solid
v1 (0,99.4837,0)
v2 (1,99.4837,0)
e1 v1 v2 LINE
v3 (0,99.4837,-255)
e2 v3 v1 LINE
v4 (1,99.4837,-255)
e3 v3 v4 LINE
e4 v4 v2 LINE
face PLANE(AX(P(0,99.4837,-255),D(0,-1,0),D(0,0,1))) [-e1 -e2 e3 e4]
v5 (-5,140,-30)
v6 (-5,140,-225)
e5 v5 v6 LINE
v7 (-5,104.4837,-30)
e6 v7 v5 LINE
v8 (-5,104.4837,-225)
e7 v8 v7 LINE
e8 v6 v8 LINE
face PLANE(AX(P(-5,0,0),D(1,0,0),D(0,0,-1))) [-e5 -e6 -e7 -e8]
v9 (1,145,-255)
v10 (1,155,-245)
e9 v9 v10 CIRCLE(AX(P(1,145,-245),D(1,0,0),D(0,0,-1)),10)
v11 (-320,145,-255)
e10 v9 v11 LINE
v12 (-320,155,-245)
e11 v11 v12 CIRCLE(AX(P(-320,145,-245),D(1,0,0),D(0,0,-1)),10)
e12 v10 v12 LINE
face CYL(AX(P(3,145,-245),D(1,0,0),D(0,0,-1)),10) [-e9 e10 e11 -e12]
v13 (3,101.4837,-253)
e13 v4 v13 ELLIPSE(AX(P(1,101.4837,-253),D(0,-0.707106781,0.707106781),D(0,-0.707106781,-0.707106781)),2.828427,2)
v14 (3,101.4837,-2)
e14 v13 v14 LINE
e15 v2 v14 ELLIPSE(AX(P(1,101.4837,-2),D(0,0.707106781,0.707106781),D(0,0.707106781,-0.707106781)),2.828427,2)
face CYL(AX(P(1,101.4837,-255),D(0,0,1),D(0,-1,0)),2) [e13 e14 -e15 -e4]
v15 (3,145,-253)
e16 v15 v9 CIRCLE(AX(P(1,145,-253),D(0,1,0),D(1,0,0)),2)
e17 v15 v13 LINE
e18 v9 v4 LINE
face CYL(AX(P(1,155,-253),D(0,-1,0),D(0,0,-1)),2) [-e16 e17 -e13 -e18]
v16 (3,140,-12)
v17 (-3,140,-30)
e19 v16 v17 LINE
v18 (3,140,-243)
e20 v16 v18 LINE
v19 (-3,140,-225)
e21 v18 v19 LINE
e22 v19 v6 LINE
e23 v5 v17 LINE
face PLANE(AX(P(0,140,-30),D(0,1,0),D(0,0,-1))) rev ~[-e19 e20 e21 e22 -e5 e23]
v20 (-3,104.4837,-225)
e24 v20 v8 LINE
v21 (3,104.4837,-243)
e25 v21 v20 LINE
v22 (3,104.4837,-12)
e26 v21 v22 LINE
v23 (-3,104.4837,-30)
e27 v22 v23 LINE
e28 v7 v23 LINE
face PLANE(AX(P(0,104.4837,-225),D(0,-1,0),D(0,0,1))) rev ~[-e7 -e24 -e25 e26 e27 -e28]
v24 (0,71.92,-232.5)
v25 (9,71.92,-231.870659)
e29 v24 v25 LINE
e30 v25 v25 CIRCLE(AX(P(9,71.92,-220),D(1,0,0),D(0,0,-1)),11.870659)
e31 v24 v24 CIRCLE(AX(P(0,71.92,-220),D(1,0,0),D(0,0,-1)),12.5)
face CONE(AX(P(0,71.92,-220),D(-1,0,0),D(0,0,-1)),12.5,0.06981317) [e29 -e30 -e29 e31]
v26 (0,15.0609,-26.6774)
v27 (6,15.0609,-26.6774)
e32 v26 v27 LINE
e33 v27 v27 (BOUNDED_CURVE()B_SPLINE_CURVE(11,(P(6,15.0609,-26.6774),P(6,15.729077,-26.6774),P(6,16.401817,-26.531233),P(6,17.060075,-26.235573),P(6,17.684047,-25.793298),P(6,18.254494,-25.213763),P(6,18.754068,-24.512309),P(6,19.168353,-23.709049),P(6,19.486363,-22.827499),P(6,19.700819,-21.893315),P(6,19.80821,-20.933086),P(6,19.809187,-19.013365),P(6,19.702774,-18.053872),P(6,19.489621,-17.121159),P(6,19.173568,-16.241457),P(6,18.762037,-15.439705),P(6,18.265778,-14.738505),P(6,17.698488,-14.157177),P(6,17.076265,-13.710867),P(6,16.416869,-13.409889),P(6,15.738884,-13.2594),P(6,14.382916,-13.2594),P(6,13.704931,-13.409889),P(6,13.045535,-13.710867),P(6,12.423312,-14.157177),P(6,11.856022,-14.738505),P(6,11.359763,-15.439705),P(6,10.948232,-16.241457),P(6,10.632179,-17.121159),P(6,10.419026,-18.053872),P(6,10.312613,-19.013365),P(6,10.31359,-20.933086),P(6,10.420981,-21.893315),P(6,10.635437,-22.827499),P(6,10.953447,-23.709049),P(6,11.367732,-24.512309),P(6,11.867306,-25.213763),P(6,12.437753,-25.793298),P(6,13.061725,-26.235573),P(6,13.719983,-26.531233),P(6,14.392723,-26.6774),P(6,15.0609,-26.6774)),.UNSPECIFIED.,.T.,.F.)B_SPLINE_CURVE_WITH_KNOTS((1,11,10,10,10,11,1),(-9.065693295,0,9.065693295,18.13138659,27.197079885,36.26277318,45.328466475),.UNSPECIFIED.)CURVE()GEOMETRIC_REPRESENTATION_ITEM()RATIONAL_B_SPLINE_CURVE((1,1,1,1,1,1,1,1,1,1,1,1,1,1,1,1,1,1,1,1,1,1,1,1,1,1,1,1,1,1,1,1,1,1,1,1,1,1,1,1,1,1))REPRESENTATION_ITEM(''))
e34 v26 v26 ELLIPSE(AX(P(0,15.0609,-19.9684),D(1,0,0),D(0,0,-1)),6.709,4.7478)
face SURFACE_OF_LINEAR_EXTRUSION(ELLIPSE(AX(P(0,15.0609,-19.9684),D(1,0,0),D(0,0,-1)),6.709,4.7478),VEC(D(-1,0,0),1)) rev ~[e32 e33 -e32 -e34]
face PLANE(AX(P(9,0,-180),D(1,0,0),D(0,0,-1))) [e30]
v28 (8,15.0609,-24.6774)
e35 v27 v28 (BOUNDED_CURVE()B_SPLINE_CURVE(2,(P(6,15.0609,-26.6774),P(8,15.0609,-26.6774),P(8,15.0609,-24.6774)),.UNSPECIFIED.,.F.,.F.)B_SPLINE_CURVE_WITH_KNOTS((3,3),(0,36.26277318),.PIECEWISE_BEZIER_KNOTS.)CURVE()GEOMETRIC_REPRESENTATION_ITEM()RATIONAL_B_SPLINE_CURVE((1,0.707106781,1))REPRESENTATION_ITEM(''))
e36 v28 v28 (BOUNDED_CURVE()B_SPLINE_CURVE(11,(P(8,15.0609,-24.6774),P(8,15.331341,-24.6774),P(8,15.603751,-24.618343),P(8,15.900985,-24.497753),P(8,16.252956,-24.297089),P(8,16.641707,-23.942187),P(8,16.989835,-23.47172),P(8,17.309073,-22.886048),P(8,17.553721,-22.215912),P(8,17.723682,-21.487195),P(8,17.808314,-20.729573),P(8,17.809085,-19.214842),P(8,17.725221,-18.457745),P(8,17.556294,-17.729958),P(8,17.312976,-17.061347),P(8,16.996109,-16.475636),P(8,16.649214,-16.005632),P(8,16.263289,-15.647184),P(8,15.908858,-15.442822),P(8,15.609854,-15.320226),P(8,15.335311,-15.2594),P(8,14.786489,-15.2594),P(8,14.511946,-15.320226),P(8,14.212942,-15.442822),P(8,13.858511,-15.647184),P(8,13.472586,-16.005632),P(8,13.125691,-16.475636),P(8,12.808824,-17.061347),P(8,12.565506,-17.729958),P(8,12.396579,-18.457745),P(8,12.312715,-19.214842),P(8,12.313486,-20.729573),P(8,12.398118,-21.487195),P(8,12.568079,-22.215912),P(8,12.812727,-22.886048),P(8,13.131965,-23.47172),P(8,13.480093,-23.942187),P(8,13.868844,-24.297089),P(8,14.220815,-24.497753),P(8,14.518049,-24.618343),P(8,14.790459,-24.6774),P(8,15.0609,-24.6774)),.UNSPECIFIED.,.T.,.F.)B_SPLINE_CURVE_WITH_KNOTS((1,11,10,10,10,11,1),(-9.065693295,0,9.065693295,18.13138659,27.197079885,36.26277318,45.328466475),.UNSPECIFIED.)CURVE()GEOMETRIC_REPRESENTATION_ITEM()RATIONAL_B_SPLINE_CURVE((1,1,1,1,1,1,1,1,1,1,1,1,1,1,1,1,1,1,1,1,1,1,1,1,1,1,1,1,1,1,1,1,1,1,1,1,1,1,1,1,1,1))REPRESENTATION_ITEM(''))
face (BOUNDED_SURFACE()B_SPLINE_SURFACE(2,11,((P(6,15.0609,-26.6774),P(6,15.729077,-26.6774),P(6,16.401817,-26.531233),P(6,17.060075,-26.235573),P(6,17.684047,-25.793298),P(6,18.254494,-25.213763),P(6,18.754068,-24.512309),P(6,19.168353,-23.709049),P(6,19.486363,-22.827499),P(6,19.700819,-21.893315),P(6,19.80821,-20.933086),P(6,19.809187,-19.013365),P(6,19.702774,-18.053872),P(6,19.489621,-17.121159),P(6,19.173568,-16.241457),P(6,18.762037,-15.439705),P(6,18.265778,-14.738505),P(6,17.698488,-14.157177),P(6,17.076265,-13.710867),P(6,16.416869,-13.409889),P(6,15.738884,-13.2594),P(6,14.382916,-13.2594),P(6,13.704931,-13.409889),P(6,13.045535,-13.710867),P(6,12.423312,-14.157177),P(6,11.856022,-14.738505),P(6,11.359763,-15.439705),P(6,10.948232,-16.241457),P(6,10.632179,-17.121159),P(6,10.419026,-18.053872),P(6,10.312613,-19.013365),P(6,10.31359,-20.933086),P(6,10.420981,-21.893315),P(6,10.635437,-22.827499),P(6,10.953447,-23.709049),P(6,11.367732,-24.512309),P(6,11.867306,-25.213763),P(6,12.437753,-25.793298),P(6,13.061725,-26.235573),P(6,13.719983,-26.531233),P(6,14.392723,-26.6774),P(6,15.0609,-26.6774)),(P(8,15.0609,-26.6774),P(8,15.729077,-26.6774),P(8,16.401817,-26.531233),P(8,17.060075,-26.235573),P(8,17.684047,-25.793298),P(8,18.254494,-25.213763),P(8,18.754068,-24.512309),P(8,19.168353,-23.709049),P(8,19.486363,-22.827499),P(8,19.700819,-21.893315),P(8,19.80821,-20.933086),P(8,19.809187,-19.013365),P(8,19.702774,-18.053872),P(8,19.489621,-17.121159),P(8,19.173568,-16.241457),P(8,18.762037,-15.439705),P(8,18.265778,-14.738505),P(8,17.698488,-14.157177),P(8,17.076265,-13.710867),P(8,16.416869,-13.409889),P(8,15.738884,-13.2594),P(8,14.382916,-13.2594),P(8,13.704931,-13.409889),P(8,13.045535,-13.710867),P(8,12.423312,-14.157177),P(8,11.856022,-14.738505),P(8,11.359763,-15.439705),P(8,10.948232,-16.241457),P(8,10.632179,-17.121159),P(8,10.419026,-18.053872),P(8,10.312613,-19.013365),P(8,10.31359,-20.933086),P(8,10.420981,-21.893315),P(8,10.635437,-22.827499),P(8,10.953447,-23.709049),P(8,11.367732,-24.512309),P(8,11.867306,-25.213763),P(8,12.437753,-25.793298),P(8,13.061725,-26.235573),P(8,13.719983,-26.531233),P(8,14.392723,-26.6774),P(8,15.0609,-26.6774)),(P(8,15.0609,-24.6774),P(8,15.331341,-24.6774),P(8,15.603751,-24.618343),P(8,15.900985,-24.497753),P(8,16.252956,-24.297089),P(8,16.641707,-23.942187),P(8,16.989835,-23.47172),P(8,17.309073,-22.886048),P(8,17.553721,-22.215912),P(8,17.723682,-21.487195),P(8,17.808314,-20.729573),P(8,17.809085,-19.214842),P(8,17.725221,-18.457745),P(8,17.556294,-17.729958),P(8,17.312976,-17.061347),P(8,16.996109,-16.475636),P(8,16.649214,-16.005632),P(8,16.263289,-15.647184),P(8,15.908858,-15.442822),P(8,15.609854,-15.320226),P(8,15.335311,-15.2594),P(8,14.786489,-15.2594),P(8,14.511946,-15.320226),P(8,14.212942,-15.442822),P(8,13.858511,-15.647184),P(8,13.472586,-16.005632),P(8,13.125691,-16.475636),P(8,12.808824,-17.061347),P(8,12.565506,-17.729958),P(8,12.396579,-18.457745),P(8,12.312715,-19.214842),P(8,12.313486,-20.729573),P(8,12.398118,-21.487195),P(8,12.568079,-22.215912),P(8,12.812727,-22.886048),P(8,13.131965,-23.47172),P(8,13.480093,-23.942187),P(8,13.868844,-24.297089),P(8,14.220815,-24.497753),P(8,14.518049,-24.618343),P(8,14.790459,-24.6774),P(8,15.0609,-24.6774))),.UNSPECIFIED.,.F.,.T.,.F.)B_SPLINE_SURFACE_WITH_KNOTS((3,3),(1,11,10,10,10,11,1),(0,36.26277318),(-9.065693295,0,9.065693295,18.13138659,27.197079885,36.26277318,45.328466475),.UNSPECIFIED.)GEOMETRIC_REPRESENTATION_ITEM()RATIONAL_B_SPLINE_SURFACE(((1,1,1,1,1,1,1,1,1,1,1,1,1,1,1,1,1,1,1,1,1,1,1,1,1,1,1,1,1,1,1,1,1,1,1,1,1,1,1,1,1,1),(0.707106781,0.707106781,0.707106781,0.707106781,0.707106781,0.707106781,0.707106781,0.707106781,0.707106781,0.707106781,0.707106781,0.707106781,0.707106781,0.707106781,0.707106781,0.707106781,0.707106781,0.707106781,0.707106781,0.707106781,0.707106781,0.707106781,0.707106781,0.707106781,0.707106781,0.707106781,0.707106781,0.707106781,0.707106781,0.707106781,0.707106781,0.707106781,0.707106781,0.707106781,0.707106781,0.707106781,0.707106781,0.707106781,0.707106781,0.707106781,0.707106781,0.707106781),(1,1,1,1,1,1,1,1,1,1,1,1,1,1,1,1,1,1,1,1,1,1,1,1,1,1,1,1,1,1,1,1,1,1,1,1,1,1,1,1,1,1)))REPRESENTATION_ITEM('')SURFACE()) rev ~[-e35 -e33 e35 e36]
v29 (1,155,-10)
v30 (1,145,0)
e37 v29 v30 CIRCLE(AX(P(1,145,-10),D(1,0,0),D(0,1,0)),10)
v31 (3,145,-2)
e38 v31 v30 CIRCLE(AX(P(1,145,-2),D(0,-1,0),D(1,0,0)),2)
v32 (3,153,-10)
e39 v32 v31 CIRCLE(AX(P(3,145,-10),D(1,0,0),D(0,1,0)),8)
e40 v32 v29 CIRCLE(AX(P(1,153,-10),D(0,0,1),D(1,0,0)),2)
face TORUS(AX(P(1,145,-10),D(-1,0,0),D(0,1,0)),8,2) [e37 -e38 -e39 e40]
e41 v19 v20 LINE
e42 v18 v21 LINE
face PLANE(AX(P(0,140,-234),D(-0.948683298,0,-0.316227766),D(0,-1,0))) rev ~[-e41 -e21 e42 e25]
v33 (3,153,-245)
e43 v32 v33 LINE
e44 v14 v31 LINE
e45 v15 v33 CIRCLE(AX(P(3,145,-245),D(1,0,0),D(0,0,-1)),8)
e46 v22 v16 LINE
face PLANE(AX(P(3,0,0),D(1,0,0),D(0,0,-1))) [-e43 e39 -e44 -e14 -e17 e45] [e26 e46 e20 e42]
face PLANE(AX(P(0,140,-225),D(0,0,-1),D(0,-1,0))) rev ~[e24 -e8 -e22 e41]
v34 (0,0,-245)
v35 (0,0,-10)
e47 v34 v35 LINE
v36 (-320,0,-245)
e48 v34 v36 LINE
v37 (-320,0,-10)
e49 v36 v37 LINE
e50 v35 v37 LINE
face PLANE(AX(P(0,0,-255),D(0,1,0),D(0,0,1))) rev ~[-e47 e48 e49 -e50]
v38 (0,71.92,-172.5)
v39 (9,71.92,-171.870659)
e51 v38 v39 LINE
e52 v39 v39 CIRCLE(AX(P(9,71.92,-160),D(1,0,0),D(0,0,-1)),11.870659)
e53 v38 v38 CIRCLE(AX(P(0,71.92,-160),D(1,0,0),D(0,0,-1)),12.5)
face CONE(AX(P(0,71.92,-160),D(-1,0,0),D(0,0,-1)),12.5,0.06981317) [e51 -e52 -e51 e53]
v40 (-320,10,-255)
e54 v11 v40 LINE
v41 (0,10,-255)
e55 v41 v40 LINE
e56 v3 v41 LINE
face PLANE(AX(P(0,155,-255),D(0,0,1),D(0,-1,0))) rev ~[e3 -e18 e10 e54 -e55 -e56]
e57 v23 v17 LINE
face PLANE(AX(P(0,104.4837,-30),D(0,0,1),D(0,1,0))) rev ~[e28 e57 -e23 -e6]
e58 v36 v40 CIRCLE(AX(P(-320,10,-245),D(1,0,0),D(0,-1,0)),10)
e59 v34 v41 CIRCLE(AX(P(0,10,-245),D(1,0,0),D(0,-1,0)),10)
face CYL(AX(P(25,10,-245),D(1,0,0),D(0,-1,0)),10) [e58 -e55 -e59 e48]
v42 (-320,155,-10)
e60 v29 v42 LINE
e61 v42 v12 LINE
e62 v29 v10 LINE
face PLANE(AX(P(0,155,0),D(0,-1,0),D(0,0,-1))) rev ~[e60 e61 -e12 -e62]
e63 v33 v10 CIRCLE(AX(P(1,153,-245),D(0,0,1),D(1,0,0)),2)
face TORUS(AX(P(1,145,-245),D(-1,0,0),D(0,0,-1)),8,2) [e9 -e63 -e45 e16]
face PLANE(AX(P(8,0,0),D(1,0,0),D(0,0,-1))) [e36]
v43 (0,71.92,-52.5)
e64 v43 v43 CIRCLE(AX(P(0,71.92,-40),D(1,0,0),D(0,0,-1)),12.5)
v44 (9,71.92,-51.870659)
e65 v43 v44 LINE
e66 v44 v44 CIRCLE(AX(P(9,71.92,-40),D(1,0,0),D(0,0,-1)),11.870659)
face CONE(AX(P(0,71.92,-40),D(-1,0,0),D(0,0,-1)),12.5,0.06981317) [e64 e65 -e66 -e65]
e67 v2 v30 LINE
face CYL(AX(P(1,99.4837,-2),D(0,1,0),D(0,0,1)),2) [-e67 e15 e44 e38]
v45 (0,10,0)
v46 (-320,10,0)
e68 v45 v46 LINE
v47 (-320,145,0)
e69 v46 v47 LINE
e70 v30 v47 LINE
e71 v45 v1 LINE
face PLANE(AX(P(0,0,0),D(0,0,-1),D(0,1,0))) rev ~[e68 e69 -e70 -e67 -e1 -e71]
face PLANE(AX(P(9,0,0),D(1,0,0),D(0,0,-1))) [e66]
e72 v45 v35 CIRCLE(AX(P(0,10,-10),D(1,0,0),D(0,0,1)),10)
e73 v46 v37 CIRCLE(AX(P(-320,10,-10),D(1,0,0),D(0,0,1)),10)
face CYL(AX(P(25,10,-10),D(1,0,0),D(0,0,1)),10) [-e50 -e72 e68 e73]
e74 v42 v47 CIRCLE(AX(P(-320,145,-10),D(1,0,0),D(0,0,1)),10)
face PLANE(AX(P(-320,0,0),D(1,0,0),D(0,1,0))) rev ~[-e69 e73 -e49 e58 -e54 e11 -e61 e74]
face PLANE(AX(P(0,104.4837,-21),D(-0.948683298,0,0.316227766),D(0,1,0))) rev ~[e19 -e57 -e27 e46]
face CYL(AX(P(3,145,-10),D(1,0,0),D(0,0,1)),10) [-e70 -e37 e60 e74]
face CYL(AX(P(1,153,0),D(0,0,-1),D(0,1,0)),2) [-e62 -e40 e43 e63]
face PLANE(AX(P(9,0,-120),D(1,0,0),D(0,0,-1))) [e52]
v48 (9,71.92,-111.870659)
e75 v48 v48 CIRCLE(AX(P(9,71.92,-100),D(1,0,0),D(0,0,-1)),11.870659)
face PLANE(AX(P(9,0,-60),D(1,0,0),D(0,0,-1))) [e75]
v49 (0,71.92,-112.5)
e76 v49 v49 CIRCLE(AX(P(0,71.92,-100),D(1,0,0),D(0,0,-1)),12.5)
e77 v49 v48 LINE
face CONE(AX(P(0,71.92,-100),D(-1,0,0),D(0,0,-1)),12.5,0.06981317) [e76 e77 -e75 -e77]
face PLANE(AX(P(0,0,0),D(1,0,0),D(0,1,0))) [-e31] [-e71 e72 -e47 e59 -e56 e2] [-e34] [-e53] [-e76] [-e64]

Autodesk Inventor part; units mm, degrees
ref_plane "YZ Plane" through (0, 0, 0) normal (1, 0, 0) x (0, 1, 0)
ref_plane "XZ Plane" through (0, 0, 0) normal (0, 1, 0) x (-1, 0, 0)
ref_plane "XY Plane" through (0, 0, 0) normal (0, 0, 1) x (1, 0, 0)
sketch "Sketch1" plane through (0, 0, 0) normal (1, 0, 0) x (0, 1, 0)
  line L0 (0, 0) -> (155, 0)
  line L1 (155, 0) -> (155, -255)
  line L2 (155, -255) -> (0, -255)
  line L3 (0, -255) -> (0, 0)
  dimension "d1" = 255
  dimension "d2" = 155
extrude "Extrusion1" add sketch "Sketch1" against normal blind 320
sketch "Sketch2" plane through (0, 0, 0) normal (1, 0, 0) x (0, 0, -1)
  line L0 (0, 0) -> (0, 155) projected
  line L1 (255, 155) -> (255, 0) projected
  line L2 (0, 155) -> (255, 155)
  line L3 (255, 155) -> (255, 99.4837)
  line L4 (255, 99.4837) -> (0, 99.4837)
  line L5 (0, 99.4837) -> (0, 155)
  line L6 (30, 140) -> (225, 140)
  line L7 (225, 140) -> (225, 104.4837)
  line L8 (225, 104.4837) -> (30, 104.4837)
  line L9 (30, 104.4837) -> (30, 140)
  dimension "d8" = 15
  dimension "d9" = 5
  dimension "d10" = 30
  dimension "d11" = 30
extrude "Extrusion2" add sketch "Sketch2" along normal blind 3 contours L0 L2 L1 L4 | L6 L7 L8 L9
fillet "Fillet1" radius 2 4 edges at (3, 155, -127.5) (3, 127.2418, 0) (3, 127.2418, -255) (3, 99.4837, -127.5)
extrude "Extrusion3" cut sketch "Sketch2" along normal blind 3 and the other way blind 5 contours L6 L7 L8 L9
chamfer "Chamfer2" distance 18 distance2 6 1 edges at (3, 122.2418, -30) measured on face at (3, 148.6667, -95)
chamfer "Chamfer3" distance 18 distance2 6 1 edges at (3, 122.2418, -225) measured on face at (3, 148.6667, -95)
sketch "Sketch3" plane through (0, 0, 0) normal (1, 0, 0) x (0, 0, -1)
  ellipse E0 centre (19.9684, 15.0609) end of major axis (26.6774, 15.0609) minor radius 4.7478
  circle A0 centre (40, 71.92) radius 12.5
  line L0 (0, 0) -> (0, 99.4837) projected
  dimension "d25" = 25
  dimension "d34" = 40
extrude "Extrusion4" add sketch "Sketch3" along normal blind 8 contours E0
fillet "Fillet2" radius 2 1 edges at (8, 15.0609, -13.2594)
extrude "Extrusion5" add sketch "Sketch3" along normal blind 9 draft -4 contours A0
pattern_linear "Rectangular Pattern1" count 4 spacing 60 along (0, 0, -1) of "Extrusion5"
fillet "Fillet3" radius 10 6 edges at (-160, 0, 0) (2.4142, 154.4142, -0.5858) (-159.5, 155, 0) (-160, 0, -255) (2.4142, 154.4142, -254.4142) (-159.5, 155, -255)
equation "\"d11\" = d10"
properties part number "labortap1"
